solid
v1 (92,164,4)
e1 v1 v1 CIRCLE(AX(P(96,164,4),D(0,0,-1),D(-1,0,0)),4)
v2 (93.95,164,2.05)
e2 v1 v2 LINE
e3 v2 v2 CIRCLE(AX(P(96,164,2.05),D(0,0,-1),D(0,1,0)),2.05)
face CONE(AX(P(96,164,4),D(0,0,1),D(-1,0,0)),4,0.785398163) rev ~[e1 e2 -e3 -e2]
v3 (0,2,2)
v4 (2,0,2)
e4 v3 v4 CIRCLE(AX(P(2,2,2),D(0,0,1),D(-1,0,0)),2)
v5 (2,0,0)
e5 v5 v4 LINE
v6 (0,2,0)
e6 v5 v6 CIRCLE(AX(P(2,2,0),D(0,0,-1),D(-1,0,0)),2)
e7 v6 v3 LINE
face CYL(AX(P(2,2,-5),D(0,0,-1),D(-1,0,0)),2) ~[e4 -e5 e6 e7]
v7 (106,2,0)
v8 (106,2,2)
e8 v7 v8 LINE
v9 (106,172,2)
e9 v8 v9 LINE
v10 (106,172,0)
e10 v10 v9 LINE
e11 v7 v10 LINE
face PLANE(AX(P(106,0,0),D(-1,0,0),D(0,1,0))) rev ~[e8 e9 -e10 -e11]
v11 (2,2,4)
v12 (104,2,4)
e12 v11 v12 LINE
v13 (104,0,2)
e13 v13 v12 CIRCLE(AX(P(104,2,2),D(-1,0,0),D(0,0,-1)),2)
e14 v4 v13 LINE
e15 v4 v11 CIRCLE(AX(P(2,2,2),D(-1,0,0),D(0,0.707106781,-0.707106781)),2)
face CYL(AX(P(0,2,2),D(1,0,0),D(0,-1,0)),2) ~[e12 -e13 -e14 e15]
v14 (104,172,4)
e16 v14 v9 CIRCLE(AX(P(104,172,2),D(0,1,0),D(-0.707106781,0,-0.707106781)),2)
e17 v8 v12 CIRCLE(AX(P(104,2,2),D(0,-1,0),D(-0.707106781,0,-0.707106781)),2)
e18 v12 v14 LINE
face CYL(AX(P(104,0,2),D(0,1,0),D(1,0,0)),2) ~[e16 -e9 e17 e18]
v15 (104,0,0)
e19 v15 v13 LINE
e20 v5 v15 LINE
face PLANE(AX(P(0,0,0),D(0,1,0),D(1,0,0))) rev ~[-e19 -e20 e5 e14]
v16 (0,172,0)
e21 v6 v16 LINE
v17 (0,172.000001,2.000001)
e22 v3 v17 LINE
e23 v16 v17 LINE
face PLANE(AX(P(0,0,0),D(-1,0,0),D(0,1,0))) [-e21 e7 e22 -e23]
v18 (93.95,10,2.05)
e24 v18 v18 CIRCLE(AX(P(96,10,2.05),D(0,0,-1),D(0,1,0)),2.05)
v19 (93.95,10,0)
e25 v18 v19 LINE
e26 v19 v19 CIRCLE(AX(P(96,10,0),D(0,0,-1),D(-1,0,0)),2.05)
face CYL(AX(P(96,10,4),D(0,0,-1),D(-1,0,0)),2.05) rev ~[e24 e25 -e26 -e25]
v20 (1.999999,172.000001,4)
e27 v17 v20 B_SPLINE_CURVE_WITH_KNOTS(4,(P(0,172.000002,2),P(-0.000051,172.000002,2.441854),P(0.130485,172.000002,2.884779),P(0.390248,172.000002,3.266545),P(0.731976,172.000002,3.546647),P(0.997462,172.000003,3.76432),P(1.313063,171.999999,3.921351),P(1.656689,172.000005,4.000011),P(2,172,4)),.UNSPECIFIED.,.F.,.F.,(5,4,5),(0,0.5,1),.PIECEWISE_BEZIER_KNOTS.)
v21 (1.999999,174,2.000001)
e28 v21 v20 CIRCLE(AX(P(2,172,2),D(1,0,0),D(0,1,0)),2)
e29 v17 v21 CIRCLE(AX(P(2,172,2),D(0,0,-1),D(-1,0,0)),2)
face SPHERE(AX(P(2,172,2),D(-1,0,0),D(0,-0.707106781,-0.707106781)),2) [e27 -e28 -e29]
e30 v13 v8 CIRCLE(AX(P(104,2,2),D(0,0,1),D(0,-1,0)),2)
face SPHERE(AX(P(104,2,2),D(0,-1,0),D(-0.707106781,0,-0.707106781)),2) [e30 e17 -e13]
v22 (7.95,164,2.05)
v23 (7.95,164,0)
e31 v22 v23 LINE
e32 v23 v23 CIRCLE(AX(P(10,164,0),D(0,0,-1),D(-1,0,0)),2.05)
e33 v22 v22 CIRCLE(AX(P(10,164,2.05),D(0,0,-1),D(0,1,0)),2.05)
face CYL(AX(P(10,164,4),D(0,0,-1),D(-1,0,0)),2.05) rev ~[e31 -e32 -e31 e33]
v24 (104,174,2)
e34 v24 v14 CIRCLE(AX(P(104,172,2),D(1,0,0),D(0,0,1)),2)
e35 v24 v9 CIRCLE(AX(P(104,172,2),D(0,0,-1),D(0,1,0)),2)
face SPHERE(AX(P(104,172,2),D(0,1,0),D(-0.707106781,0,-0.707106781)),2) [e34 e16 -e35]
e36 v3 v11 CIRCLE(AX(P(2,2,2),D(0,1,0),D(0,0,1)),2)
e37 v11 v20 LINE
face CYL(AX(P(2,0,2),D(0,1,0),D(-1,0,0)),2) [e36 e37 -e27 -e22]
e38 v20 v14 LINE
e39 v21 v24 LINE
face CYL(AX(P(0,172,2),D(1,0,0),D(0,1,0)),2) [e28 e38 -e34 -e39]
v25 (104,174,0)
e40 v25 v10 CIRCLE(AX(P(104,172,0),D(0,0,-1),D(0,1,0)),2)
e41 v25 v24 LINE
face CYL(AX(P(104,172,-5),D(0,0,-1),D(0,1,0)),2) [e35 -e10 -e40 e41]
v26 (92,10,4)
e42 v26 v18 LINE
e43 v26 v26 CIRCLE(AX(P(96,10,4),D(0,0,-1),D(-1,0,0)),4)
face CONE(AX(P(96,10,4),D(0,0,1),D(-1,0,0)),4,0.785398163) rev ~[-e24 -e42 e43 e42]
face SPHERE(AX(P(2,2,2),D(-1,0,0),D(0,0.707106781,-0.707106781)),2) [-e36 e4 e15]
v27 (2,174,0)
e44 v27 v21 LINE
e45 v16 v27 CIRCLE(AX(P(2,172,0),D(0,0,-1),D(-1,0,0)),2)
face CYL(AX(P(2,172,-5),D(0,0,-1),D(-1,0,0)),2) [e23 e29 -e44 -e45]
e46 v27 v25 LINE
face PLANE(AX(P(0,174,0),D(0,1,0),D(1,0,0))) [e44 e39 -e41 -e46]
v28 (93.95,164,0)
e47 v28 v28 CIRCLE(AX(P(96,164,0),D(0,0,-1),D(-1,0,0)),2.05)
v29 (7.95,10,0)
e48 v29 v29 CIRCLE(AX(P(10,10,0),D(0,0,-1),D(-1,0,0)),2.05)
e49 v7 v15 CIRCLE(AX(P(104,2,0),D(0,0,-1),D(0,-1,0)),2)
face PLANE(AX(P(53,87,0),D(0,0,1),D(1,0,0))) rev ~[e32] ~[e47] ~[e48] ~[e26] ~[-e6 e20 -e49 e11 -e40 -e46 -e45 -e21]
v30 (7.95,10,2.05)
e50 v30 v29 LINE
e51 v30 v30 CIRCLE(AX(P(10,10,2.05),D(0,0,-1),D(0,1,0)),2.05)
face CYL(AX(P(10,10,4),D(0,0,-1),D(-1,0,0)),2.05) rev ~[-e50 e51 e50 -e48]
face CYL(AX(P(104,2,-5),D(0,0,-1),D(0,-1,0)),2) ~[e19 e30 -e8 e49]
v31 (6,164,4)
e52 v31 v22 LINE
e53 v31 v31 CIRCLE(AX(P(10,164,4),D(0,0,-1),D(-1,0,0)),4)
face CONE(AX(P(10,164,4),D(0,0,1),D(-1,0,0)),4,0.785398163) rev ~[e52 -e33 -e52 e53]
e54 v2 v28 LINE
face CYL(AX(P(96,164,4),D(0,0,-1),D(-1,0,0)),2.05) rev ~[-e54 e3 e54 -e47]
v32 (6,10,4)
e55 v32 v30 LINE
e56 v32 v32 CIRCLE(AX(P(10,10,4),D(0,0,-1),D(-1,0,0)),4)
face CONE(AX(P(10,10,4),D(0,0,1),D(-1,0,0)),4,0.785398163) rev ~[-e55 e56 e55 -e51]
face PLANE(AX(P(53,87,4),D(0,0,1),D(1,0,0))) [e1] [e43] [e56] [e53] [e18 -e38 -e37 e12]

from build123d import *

# Parameters (mm, degrees)
F0_W           = 106
F0_H           = 174
F1_DEPTH       = 4
F2_R           = 2
F3_T1_DEPTH    = 7
F3_S5_W        = 2
F3_S5_H        = 2
F3_T6_DEPTH    = 2
F3_S11_W       = 2
F3_S11_H       = 2
F3_T12_DEPTH   = 2
F3_S17_W       = 2
F3_S17_H       = 2
F3_T18_DEPTH   = 2
F3_S23_W       = 2
F3_S23_H       = 2
F3_T24_DEPTH   = 2
F5_D           = 4.1
F5_DEPTH       = 40
F5_CSINK_D     = 8
F5_CSINK_ANGLE = 90
F5_TIP         = 1.231764269


# Not quite as in the source:
# - a fillet or chamfer that OpenCascade refuses, or shapes differently, is made with other operations: its cross-section is extruded or revolved along the edge and cut away or added


with BuildPart() as f1:
    # F0 (on Top) → F1 (new body)
    with BuildSketch(Plane.XY):
        with Locations((53, 87)):
            Rectangle(F0_W, F0_H)
    extrude(amount=F1_DEPTH)

    # F2
    f2_edges = [f1.edges().sort_by_distance(p)[0] for p in [
        (53, 0, 4),
        (0, 87, 4),
        (106, 87, 4),
        (53, 174, 4),
    ]]
    fillet(f2_edges, radius=F2_R)

    # F3: fillet of radius 2 on 4 edges, made by hand

    # F3_s2 → F3_t1 (cut)
    with BuildSketch(Plane.XY.offset(-5)):
        with BuildLine():
            ThreePointArc((104, 0), (105.4142135624, 0.5857864376), (106, 2))
            Line((106, 2), (106, 0))
            Line((106, 0), (104, 0))
        make_face()
        with BuildLine():
            ThreePointArc((0, 2), (0.5857864376, 0.5857864376), (2, 0))
            Line((2, 0), (0, 0))
            Line((0, 0), (0, 2))
        make_face()
        with BuildLine():
            ThreePointArc((0, 172), (0.5857864376, 173.4142135624), (2, 174))
            Line((2, 174), (0, 174))
            Line((0, 174), (0, 172))
        make_face()
        with BuildLine():
            ThreePointArc((104, 174), (105.4142135624, 173.4142135624), (106, 172))
            Line((106, 172), (106, 174))
            Line((106, 174), (104, 174))
        make_face()
    extrude(amount=F3_T1_DEPTH, mode=Mode.SUBTRACT)


with BuildPart() as f3_tool4:
    # F3_s5 → F3_t6 (new body)
    with BuildSketch(Plane.XZ.offset(-172)):
        with Locations((105, 3)):
            Rectangle(F3_S5_W, F3_S5_H)
    extrude(amount=-F3_T6_DEPTH)

    # F3_s7 → F3_t8 (revolve, cut)
    with BuildSketch(Plane(origin=(104, 172, 2), x_dir=(-0.7071067812, 0, -0.7071067812), z_dir=(0.7071067812, 0, -0.7071067812))):
        with BuildLine():
            ThreePointArc((0, -2), (2, 0), (0, 2))
            Line((0, 2), (0, -2))
        make_face()
    revolve(axis=Axis((104, 172, 2), (0, 1, 0)), mode=Mode.SUBTRACT)


with BuildPart() as f1_1:
    add(f1.part)

    # F3_t3: cut F3_tool4
    add(f3_tool4.part, mode=Mode.SUBTRACT)


with BuildPart() as f3_tool10:
    # F3_s11 → F3_t12 (new body)
    with BuildSketch(Plane.YZ.offset(2)):
        with Locations((173, 3)):
            Rectangle(F3_S11_W, F3_S11_H)
    extrude(amount=-F3_T12_DEPTH)

    # F3_s13 → F3_t14 (revolve, cut)
    with BuildSketch(Plane(origin=(2, 172, 2), x_dir=(0, -0.7071067812, -0.7071067812), z_dir=(0, 0.7071067812, -0.7071067812))):
        with BuildLine():
            ThreePointArc((0, -2), (2, 0), (0, 2))
            Line((0, 2), (0, -2))
        make_face()
    revolve(axis=Axis((2, 172, 2), (-1, 0, 0)), mode=Mode.SUBTRACT)


with BuildPart() as f1_2:
    add(f1_1.part)

    # F3_t9: cut F3_tool10
    add(f3_tool10.part, mode=Mode.SUBTRACT)


with BuildPart() as f3_tool16:
    # F3_s17 → F3_t18 (new body)
    with BuildSketch(Plane.YZ.offset(2)):
        with Locations((1, 3)):
            Rectangle(F3_S17_W, F3_S17_H)
    extrude(amount=-F3_T18_DEPTH)

    # F3_s19 → F3_t20 (revolve, cut)
    with BuildSketch(Plane(origin=(2, 2, 2), x_dir=(0, 0.7071067812, -0.7071067812), z_dir=(0, 0.7071067812, 0.7071067812))):
        with BuildLine():
            ThreePointArc((0, -2), (2, 0), (0, 2))
            Line((0, 2), (0, -2))
        make_face()
    revolve(axis=Axis((2, 2, 2), (-1, 0, 0)), mode=Mode.SUBTRACT)


with BuildPart() as f1_3:
    add(f1_2.part)

    # F3_t15: cut F3_tool16
    add(f3_tool16.part, mode=Mode.SUBTRACT)


with BuildPart() as f3_tool22:
    # F3_s23 → F3_t24 (new body)
    with BuildSketch(Plane.XZ.offset(-2)):
        with Locations((105, 3)):
            Rectangle(F3_S23_W, F3_S23_H)
    extrude(amount=F3_T24_DEPTH)

    # F3_s25 → F3_t26 (revolve, cut)
    with BuildSketch(Plane(origin=(104, 2, 2), x_dir=(-0.7071067812, 0, -0.7071067812), z_dir=(-0.7071067812, 0, 0.7071067812))):
        with BuildLine():
            ThreePointArc((0, -2), (2, 0), (0, 2))
            Line((0, 2), (0, -2))
        make_face()
    revolve(axis=Axis((104, 2, 2), (0, -1, 0)), mode=Mode.SUBTRACT)


with BuildPart() as f1_4:
    add(f1_3.part)

    # F3_t21: cut F3_tool22
    add(f3_tool22.part, mode=Mode.SUBTRACT)

    # F5
    with Locations(Plane.XY.offset(4)):
        with Locations((10, 164), (10, 10), (96, 164), (96, 10)):
            CounterSinkHole(F5_D / 2, F5_CSINK_D / 2, depth=F5_DEPTH, counter_sink_angle=F5_CSINK_ANGLE)
            with Locations((0, 0, -(F5_DEPTH + F5_TIP / 2))):  # 118° drill point
                Cone(0, F5_D / 2, F5_TIP, mode=Mode.SUBTRACT)


solid = f1_4.part
